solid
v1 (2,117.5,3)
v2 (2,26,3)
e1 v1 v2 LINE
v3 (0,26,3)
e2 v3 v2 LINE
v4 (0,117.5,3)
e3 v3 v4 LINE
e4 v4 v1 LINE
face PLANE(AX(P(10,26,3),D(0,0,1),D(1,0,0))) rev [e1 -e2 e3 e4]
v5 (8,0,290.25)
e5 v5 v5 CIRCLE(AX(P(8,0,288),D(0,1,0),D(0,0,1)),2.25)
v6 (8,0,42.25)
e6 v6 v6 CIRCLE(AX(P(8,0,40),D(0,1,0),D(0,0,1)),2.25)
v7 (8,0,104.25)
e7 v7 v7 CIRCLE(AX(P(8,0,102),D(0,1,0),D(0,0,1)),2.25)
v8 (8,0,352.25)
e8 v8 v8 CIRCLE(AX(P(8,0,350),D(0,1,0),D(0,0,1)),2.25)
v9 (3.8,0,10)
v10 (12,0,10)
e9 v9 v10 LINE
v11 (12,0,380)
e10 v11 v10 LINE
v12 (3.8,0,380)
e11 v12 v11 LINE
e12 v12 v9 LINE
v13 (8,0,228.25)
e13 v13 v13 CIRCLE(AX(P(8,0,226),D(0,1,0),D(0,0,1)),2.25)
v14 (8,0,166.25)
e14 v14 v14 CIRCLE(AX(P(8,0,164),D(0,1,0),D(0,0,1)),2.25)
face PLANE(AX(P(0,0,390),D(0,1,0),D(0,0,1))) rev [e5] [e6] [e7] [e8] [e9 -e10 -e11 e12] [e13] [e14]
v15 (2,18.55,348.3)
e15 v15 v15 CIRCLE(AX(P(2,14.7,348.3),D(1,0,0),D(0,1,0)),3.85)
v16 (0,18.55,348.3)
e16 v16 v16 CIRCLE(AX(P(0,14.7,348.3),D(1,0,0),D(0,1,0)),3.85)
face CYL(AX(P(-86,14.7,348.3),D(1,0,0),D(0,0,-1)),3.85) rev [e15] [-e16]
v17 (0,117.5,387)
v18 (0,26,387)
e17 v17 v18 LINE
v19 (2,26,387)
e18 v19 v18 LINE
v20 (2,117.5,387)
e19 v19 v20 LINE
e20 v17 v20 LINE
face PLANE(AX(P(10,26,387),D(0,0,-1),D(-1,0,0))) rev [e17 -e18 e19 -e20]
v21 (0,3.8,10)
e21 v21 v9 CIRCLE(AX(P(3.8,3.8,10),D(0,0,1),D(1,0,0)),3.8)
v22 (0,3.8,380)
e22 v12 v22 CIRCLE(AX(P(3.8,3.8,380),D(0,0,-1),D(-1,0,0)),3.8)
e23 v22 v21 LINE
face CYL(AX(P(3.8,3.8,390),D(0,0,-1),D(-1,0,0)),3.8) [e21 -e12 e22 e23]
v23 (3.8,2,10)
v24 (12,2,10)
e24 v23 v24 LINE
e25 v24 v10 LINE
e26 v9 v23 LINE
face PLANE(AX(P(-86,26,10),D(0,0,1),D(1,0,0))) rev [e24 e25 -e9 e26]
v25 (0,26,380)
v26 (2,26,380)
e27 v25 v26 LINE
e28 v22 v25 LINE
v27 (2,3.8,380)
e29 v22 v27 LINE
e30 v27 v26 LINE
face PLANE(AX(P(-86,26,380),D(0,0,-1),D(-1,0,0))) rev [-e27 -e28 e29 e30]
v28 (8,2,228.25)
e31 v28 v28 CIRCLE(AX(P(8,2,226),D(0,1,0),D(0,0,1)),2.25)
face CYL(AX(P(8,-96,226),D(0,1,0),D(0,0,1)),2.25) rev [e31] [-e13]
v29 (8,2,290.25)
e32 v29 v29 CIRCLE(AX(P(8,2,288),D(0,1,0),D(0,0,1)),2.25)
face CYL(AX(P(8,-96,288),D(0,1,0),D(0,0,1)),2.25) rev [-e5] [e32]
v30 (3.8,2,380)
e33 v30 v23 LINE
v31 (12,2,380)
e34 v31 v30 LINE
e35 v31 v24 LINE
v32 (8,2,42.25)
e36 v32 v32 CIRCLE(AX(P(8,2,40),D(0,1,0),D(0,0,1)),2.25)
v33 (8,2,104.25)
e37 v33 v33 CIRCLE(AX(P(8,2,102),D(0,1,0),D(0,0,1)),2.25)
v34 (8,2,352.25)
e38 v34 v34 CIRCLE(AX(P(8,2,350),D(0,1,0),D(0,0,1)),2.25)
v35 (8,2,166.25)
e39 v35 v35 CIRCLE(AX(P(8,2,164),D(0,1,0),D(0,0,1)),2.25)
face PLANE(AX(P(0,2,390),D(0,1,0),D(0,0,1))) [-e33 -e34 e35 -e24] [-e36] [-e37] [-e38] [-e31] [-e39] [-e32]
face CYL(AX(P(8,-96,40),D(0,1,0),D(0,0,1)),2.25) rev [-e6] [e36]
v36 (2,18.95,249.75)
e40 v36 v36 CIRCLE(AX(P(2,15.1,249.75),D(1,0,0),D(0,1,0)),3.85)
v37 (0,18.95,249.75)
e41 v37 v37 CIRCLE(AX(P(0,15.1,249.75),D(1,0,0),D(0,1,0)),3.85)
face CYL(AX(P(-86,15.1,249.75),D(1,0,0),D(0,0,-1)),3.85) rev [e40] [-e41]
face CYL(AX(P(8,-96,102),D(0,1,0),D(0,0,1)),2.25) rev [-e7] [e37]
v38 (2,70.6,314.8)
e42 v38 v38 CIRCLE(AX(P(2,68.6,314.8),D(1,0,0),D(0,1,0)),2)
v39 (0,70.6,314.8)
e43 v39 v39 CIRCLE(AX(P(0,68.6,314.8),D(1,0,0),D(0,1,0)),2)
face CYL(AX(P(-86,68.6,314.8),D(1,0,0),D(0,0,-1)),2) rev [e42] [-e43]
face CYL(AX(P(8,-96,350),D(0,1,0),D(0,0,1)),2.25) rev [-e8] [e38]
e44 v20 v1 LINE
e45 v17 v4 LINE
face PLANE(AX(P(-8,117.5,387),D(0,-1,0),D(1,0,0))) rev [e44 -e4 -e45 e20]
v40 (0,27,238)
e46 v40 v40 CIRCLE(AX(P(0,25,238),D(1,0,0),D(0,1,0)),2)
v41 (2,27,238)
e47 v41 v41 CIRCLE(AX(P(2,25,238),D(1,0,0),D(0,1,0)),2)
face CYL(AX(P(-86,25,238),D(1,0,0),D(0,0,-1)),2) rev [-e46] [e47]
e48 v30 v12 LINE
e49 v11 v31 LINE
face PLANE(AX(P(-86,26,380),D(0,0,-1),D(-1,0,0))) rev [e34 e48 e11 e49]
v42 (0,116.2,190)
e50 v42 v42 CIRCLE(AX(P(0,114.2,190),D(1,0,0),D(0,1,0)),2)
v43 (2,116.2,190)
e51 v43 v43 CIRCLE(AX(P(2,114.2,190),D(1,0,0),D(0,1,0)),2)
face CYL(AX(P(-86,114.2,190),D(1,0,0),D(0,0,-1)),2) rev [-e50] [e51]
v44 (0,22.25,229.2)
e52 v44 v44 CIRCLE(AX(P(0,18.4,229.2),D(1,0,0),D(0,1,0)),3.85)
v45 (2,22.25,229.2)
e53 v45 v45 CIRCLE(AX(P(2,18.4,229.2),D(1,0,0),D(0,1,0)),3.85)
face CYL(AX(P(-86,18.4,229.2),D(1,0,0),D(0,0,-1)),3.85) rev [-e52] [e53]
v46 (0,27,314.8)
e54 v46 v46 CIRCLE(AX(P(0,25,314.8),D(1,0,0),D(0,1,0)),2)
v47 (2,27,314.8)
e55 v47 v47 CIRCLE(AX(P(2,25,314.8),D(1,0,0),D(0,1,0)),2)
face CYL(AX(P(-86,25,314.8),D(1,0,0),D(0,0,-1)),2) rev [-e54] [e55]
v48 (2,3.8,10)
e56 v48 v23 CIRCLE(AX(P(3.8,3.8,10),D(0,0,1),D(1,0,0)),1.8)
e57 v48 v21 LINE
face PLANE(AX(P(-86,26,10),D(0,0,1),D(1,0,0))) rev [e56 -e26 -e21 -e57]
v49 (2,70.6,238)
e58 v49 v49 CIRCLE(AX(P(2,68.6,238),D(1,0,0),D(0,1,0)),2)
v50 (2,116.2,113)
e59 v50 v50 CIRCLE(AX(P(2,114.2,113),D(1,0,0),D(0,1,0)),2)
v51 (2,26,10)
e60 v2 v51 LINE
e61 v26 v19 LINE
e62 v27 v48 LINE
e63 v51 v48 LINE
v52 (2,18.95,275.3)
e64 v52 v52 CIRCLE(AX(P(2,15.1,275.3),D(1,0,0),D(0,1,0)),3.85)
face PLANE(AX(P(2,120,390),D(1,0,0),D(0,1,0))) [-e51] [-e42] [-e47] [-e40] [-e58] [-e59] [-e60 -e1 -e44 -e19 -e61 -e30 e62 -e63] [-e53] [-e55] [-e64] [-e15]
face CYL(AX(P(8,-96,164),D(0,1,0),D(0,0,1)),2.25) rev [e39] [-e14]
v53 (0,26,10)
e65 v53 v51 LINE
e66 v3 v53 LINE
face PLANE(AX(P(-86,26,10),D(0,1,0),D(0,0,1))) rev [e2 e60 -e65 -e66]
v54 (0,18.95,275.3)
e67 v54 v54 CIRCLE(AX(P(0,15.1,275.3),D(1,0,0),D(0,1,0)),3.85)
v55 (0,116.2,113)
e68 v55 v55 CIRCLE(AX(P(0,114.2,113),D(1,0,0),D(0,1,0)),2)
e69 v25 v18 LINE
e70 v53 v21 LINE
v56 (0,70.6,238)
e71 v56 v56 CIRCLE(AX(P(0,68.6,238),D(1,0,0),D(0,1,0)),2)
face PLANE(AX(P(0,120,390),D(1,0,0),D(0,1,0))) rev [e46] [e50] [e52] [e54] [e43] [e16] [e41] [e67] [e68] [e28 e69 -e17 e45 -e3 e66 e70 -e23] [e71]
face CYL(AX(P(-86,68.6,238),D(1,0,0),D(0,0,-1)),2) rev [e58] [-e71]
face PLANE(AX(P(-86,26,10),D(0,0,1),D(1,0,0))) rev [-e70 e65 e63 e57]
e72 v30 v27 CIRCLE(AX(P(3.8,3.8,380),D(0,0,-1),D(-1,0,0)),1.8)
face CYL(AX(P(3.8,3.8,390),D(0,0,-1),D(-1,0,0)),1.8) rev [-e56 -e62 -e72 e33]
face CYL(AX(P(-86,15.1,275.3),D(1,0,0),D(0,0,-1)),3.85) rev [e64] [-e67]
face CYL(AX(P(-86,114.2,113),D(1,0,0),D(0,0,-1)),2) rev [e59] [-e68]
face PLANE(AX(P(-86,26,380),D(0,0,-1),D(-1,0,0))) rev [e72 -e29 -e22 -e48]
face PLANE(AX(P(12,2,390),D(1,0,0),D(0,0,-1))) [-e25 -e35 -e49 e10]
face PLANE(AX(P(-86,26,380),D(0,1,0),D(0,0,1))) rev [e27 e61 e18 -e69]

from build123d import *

# Parameters (mm, degrees)
FLANGE_BASE1_DEPTH    = 390
ESBO_O6_R             = 2
ESBO_O6_R_2           = 3.85
ESBO_O6_W             = 10
ESBO_O6_H             = 26
CORTE_EXTRUS_O1_DEPTH = 98
ESBO_O7_R             = 2.25
CORTE_EXTRUS_O2_DEPTH = 98
ESBO_O8_W             = 3
ESBO_O8_H             = 94
CORTE_EXTRUS_O3_DEPTH = 10
ESBO_O9_W             = 384
ESBO_O9_H             = 2.5
CORTE_EXTRUS_O4_DEPTH = 10


# Sheet-metal steps are written as plain solids
with BuildPart() as part:
    # Esboço1 → Flange-base1 (new body)
    with BuildSketch(Plane.XY):
        with BuildLine():
            Line((0, 120), (0, 3.8))
            ThreePointArc((0, 3.8), (1.112994231, 1.112994231), (3.8, 0))
            Line((3.8, 0), (12, 0))
            Line((12, 0), (12, 2))
            Line((12, 2), (3.8, 2))
            ThreePointArc((3.8, 2), (2.527207794, 2.527207794), (2, 3.8))
            Line((2, 3.8), (2, 120))
            Line((2, 120), (0, 120))
        make_face()
    extrude(amount=FLANGE_BASE1_DEPTH)

    # Esboço6 → Corte-extrusão1 (cut)
    with BuildSketch(Plane(origin=(12, 0, 0), x_dir=(0, 0, -1), z_dir=(1, 0, 0))):
        with Locations(Location((-314.8, 25, 0), (0, 0, 90))):
            Circle(ESBO_O6_R)
        with Locations(Location((-314.8, 68.6, 0), (0, 0, 90))):
            Circle(ESBO_O6_R)
        with Locations(Location((-238, 25, 0), (0, 0, 90))):
            Circle(ESBO_O6_R)
        with Locations(Location((-238, 68.6, 0), (0, 0, 90))):
            Circle(ESBO_O6_R)
        with Locations(Location((-275.3, 15.1, 0), (0, 0, 90))):
            Circle(ESBO_O6_R_2)
        with Locations(Location((-249.75, 15.1, 0), (0, 0, 90))):
            Circle(ESBO_O6_R_2)
        with Locations(Location((-229.2, 18.4, 0), (0, 0, 90))):
            Circle(ESBO_O6_R_2)
        with Locations(Location((-190, 114.2, 0), (0, 0, 90))):
            Circle(ESBO_O6_R)
        with Locations(Location((-113, 114.2, 0), (0, 0, 90))):
            Circle(ESBO_O6_R)
        with Locations(Location((-348.3, 14.7, 0), (0, 0, 90))):
            Circle(ESBO_O6_R_2)
        with Locations((-5, 13)):
            Rectangle(ESBO_O6_W, ESBO_O6_H)
        with Locations((-385, 13)):
            Rectangle(ESBO_O6_W, ESBO_O6_H)
    extrude(amount=-CORTE_EXTRUS_O1_DEPTH, mode=Mode.SUBTRACT)

    # Esboço7 → Corte-extrusão2 (cut)
    with BuildSketch(Plane(origin=(0, 2, 0), x_dir=(1, 0, 0), z_dir=(0, 1, 0))):
        with Locations(Location((8, -350, 0), (0, 0, 270))):
            Circle(ESBO_O7_R)
        with Locations(Location((8, -288, 0), (0, 0, 270))):
            Circle(ESBO_O7_R)
        with Locations(Location((8, -226, 0), (0, 0, 270))):
            Circle(ESBO_O7_R)
        with Locations(Location((8, -164, 0), (0, 0, 270))):
            Circle(ESBO_O7_R)
        with Locations(Location((8, -102, 0), (0, 0, 270))):
            Circle(ESBO_O7_R)
        with Locations(Location((8, -40, 0), (0, 0, 270))):
            Circle(ESBO_O7_R)
    extrude(amount=-CORTE_EXTRUS_O2_DEPTH, mode=Mode.SUBTRACT)

    # Esboço8 → Corte-extrusão3 (cut)
    with BuildSketch(Plane.ZY):
        with Locations((1.5, 73)):
            Rectangle(ESBO_O8_W, ESBO_O8_H)
        with Locations((388.5, 73)):
            Rectangle(ESBO_O8_W, ESBO_O8_H)
    extrude(amount=-CORTE_EXTRUS_O3_DEPTH, mode=Mode.SUBTRACT)

    # Esboço9 → Corte-extrusão4 (cut)
    with BuildSketch(Plane(origin=(2, 0, 0), x_dir=(0, 0, -1), z_dir=(1, 0, 0))):
        with Locations((-195, 118.75)):
            Rectangle(ESBO_O9_W, ESBO_O9_H)
    extrude(amount=-CORTE_EXTRUS_O4_DEPTH, mode=Mode.SUBTRACT)


solid = part.part
